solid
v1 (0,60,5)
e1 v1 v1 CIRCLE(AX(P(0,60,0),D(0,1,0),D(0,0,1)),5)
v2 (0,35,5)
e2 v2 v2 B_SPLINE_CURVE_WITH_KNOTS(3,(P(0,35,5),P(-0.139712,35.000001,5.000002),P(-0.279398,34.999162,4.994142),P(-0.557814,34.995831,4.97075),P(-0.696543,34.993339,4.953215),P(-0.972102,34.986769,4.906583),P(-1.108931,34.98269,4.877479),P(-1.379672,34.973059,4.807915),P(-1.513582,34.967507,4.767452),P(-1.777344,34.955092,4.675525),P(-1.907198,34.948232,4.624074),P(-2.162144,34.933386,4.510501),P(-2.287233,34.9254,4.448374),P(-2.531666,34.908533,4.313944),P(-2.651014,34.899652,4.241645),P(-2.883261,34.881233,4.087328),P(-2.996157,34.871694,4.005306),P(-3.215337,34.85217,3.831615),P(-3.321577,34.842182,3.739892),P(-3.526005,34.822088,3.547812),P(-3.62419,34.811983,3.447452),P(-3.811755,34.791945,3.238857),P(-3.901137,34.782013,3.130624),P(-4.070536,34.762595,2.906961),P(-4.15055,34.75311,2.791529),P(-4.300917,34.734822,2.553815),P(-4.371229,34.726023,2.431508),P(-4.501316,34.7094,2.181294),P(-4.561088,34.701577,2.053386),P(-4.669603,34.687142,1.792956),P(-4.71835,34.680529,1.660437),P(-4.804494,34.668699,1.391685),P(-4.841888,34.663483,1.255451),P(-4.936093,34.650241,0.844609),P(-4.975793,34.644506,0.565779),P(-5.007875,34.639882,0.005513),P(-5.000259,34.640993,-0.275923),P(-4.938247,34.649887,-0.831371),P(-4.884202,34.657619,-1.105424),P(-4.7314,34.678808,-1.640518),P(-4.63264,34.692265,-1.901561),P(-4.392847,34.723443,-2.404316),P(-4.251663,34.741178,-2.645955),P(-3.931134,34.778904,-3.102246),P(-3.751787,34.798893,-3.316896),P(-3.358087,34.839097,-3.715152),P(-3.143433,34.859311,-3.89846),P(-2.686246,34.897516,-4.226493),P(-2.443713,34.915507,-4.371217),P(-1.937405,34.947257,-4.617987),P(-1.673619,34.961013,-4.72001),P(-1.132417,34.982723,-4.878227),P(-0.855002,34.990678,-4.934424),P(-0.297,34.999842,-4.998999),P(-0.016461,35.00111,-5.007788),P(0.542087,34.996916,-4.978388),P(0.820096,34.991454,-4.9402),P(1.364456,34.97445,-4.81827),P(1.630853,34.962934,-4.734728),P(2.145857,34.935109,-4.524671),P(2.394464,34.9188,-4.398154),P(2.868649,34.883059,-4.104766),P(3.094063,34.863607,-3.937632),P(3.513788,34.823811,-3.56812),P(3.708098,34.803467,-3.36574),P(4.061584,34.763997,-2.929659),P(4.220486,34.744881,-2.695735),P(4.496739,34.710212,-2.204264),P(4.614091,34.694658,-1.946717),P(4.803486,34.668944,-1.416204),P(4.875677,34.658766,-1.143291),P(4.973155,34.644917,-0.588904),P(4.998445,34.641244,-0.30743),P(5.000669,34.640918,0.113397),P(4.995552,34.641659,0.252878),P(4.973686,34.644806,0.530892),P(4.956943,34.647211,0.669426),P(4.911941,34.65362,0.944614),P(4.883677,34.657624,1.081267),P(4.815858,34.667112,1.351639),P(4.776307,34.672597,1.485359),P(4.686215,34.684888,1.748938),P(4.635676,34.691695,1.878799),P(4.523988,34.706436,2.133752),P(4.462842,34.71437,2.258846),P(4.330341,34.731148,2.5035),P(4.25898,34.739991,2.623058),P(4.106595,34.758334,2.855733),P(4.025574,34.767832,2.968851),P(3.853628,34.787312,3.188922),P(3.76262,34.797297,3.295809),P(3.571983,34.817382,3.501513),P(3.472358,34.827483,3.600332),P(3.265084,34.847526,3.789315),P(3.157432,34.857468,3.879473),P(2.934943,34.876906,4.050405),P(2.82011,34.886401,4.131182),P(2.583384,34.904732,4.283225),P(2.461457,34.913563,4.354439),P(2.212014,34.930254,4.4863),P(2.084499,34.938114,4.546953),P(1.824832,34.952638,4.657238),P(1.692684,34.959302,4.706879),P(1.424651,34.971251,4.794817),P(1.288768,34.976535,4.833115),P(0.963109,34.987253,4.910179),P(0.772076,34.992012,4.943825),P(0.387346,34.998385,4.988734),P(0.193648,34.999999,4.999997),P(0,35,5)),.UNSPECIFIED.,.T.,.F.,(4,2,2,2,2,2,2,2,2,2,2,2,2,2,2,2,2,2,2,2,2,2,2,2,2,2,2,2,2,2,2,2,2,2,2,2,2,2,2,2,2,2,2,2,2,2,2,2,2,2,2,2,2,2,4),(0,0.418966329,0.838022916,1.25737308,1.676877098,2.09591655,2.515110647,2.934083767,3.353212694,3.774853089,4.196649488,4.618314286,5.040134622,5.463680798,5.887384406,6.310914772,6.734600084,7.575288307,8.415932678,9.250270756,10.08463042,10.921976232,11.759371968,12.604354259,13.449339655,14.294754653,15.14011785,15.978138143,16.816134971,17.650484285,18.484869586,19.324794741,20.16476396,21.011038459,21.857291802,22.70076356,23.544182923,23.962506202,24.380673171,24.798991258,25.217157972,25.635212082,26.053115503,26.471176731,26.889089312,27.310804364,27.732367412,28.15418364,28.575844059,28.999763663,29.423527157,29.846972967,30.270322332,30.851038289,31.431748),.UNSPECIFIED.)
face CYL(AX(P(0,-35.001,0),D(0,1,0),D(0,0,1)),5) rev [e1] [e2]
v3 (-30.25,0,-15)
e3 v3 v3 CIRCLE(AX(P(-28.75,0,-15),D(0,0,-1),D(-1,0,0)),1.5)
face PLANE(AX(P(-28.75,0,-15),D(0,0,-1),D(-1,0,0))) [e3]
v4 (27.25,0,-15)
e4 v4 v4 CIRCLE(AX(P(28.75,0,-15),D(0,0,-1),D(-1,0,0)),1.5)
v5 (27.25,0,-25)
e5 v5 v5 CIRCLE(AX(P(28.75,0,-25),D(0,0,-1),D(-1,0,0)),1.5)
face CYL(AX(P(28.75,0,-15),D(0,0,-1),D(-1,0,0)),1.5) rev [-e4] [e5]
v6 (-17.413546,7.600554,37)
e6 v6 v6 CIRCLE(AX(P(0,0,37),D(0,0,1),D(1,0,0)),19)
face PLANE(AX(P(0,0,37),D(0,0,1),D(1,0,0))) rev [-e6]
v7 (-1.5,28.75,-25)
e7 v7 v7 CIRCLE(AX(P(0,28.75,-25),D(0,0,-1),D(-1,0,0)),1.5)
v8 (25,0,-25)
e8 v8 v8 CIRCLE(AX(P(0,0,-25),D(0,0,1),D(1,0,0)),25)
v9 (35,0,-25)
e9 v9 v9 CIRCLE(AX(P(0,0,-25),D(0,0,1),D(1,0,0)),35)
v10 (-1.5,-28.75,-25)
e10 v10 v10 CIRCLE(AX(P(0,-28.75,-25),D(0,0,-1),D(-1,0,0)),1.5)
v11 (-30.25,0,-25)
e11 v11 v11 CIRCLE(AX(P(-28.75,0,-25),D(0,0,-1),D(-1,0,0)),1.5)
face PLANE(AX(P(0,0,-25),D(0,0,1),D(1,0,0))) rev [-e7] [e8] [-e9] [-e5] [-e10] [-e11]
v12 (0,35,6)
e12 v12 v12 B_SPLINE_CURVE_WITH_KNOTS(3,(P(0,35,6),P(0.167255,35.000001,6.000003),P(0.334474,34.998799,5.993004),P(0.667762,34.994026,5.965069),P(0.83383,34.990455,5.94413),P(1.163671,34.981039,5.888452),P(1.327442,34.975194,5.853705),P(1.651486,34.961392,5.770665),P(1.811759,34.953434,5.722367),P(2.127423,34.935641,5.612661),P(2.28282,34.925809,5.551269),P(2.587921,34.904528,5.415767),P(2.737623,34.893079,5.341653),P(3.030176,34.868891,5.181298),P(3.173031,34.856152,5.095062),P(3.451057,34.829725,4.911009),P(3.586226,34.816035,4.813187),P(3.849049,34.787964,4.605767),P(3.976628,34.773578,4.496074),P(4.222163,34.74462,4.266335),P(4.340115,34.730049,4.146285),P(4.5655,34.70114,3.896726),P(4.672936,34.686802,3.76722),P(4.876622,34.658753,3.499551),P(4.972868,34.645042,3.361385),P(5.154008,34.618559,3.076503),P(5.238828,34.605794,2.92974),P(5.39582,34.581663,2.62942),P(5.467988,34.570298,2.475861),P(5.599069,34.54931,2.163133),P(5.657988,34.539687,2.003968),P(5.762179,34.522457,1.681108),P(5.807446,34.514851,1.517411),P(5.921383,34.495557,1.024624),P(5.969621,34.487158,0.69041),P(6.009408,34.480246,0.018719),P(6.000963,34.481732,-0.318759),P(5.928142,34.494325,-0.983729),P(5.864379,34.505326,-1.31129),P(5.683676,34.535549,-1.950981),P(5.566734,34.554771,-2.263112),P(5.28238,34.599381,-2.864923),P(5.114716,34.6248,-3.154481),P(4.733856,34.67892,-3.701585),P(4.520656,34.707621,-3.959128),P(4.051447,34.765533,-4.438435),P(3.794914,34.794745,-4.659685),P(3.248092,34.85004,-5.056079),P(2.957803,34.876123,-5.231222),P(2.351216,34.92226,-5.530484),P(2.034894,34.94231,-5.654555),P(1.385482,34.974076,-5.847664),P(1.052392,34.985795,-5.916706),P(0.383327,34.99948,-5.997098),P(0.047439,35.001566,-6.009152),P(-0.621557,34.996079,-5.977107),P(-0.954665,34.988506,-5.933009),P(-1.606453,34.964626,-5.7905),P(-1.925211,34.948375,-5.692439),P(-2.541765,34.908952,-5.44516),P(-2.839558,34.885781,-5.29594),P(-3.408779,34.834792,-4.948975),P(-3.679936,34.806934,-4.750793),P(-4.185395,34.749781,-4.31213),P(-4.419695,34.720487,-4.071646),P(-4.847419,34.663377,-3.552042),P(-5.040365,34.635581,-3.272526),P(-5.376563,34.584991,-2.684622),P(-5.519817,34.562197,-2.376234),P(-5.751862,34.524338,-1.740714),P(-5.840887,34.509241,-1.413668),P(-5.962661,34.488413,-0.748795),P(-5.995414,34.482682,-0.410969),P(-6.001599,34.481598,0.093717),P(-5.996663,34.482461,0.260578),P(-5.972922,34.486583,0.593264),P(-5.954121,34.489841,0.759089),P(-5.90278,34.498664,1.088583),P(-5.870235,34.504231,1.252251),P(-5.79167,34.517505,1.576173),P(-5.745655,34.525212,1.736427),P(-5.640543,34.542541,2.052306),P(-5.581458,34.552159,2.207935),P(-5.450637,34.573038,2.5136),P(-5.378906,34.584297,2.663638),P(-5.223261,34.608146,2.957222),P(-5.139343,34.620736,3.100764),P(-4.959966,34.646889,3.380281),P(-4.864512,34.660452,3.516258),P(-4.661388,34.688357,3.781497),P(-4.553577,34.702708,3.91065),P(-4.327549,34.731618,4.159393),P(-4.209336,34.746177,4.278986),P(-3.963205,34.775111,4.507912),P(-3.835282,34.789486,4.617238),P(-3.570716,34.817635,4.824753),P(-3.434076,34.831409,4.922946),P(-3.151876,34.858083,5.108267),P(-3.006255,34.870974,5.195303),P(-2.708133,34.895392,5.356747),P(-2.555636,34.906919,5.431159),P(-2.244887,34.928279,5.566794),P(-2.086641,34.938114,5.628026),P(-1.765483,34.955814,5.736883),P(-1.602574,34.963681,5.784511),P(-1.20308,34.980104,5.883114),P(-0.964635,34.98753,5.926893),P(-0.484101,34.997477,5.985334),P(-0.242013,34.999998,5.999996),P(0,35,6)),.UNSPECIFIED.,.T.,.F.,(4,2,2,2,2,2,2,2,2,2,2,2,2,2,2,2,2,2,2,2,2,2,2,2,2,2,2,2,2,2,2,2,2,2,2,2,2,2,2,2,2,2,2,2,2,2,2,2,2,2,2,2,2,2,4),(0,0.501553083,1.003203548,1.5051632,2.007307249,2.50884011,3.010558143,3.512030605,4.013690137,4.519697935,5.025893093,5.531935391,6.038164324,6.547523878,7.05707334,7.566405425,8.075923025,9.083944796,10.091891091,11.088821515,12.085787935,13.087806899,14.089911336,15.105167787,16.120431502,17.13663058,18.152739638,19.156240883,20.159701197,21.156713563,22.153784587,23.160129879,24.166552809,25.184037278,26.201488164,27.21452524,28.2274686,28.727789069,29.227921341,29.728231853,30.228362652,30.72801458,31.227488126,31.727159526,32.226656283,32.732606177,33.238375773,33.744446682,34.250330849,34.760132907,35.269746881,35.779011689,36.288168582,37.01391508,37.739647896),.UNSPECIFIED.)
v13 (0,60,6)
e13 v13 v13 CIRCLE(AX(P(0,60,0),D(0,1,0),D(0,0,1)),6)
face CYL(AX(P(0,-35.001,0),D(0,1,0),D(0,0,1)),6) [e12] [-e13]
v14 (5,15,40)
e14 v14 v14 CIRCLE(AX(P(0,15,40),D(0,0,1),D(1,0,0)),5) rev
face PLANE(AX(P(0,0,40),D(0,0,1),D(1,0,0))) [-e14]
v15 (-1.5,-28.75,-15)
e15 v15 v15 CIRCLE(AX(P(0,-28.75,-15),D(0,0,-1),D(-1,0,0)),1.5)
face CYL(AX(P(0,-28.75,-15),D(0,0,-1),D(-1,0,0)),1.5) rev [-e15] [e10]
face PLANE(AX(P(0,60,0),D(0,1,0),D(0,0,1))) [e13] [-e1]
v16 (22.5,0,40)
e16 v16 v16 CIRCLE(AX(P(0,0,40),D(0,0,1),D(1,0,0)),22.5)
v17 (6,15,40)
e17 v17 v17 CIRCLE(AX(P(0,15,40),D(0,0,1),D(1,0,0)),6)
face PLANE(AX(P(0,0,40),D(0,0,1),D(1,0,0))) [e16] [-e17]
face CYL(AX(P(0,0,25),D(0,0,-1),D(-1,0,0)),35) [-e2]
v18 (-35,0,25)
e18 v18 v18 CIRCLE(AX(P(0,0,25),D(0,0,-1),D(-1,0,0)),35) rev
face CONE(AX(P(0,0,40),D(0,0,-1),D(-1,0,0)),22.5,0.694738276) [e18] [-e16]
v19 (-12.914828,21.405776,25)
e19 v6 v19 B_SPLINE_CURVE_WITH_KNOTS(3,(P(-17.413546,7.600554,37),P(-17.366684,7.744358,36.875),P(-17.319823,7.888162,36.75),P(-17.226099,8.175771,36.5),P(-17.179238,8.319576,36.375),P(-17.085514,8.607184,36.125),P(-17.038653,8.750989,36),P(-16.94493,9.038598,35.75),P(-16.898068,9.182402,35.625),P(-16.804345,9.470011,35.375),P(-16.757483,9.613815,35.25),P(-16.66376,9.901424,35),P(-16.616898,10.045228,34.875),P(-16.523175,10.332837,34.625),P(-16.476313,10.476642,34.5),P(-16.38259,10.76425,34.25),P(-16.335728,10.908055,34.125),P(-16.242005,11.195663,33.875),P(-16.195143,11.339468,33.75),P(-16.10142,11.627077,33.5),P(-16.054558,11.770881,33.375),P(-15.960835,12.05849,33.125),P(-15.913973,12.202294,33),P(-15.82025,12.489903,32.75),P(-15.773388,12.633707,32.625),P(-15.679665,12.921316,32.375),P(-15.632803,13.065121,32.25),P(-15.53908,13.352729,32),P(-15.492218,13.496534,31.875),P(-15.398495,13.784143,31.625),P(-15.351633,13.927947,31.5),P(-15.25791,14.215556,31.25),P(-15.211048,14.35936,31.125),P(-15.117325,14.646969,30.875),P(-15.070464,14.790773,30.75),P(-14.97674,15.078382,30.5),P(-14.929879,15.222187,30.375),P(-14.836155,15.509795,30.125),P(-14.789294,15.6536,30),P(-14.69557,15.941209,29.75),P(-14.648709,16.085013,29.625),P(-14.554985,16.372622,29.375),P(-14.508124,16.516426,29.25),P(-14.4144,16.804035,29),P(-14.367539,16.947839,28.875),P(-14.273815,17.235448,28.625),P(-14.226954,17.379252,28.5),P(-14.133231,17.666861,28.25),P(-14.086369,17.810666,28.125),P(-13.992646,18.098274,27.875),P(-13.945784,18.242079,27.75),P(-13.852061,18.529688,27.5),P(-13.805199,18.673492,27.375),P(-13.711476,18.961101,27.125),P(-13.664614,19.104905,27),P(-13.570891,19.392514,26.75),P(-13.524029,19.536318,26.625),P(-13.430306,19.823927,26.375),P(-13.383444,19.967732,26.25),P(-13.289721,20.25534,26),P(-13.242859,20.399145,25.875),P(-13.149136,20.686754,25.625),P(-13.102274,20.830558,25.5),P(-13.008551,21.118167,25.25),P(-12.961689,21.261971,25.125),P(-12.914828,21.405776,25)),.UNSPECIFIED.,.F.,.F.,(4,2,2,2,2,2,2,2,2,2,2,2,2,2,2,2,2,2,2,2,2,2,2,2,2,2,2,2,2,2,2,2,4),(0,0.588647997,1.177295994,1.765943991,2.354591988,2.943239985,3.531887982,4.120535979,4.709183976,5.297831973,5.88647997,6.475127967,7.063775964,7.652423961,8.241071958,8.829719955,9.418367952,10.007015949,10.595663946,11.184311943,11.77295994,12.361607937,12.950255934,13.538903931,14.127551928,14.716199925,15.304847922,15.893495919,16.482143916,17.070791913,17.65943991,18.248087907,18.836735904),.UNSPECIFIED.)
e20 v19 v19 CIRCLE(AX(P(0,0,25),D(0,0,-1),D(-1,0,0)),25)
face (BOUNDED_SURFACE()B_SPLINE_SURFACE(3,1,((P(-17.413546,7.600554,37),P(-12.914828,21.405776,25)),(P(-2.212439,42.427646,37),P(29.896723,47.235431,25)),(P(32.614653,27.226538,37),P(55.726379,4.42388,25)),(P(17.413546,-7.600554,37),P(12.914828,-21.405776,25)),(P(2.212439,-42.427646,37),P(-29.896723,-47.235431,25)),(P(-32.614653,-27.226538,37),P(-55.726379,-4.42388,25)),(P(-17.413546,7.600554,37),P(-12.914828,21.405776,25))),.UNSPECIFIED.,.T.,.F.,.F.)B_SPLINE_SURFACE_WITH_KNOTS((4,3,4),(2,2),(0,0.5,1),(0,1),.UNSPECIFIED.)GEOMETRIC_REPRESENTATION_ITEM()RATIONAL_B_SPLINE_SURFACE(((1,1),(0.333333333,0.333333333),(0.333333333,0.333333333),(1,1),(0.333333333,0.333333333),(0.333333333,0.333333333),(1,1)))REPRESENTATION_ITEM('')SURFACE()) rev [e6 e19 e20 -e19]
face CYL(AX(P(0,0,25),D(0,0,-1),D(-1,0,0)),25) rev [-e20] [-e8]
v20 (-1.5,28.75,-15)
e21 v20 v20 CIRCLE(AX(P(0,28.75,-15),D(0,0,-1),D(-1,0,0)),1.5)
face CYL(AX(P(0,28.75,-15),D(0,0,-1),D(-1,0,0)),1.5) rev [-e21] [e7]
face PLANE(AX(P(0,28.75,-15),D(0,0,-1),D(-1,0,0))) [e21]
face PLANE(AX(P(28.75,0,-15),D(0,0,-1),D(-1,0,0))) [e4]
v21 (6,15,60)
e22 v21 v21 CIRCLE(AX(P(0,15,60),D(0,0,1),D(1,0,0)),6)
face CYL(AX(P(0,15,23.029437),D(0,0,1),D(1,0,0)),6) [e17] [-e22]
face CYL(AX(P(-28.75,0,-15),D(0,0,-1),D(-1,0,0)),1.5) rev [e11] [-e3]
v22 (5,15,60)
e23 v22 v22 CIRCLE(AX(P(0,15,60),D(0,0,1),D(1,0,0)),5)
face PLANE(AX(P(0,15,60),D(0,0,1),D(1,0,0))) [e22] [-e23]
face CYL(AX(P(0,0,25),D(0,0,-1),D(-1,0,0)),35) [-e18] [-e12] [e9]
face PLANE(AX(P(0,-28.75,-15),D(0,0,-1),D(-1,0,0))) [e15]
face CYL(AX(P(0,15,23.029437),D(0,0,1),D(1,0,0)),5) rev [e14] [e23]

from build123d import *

# Parameters (mm, degrees)
SKETCH_1_R           = 35
SKETCH_1_R_2         = 25
EXTRUDE_1_DEPTH      = 25
SKETCH_2_R           = 1.5
CUT_EXTRUDE_1_DEPTH  = 10
SKETCH_4_R           = 22.5
SKETCH_3_R           = 35
EXTRUDE_2_REACH      = 110.858
EXTRUDE_2_END_RADIUS = 35
SKETCH_7_R           = 6
SKETCH_7_R_2         = 5
SKETCH_9_R           = 6
SKETCH_9_R_2         = 5
EXTRUDE_3_DEPTH      = 20


with BuildPart() as part:
    # 草图1 → 凸台-拉伸1 (new, symmetric)
    with BuildSketch(Plane.XY):
        Circle(SKETCH_1_R)
        Circle(SKETCH_1_R_2, mode=Mode.SUBTRACT)
    extrude(amount=EXTRUDE_1_DEPTH, both=True)

    # 草图2 → 切除-拉伸1 (cut)
    with BuildSketch(Plane(origin=(0, 0, -25), x_dir=(-1, 0, 0), z_dir=(0, 0, -1))):
        with Locations((0, 28.75)):
            Circle(SKETCH_2_R)
        with Locations((28.75, 0)):
            Circle(SKETCH_2_R)
        with Locations((0, -28.75)):
            Circle(SKETCH_2_R)
        with Locations((-28.75, 0)):
            Circle(SKETCH_2_R)
    extrude(amount=-CUT_EXTRUDE_1_DEPTH, mode=Mode.SUBTRACT)

    # 草图4 → Loft 1 section 0
    with BuildSketch(Plane.XY.offset(40)):
        Circle(SKETCH_4_R)
    # 草图3 → Loft 1 section 1
    with BuildSketch(Plane.XY.offset(25)):
        Circle(SKETCH_3_R)
    loft()

    # Loft 1 2: read off the stored shape, not the designer's step
    # Loft 1 2: loft between two sections, ruled curve by curve
    loft_1_2_from = [
        Edge.make_bspline([(-17.413546016, 7.600553608, 37), (-2.212438801, 42.42764564, 37), (32.614653231, 27.226538425, 37), (17.413546016, -7.600553608, 37), (2.212438801, -42.42764564, 37), (-32.614653231, -27.226538425, 37), (-17.413546016, 7.600553608, 37)], [0, 0, 0, 0, 0.5, 0.5, 0.5, 1, 1, 1, 1], 3, [1, 0.333333333, 0.333333333, 1, 0.333333333, 0.333333333, 1]),
    ]
    loft_1_2_to = [
        Edge.make_bspline([(-12.914827658, 21.405775542, 25), (29.896723426, 47.235430858, 25), (55.726378742, 4.423879774, 25), (12.914827658, -21.405775542, 25), (-29.896723426, -47.235430858, 25), (-55.726378742, -4.423879774, 25), (-12.914827658, 21.405775542, 25)], [0, 0, 0, 0, 0.5, 0.5, 0.5, 1, 1, 1, 1], 3, [1, 0.333333333, 0.333333333, 1, 0.333333333, 0.333333333, 1]),
    ]
    loft_1_2 = Solid(Shell([*[Face.make_surface_from_curves(loft_1_2_from[k], loft_1_2_to[k]) for k in range(1)], Face(Wire(loft_1_2_from)), Face(Wire(loft_1_2_to))]))
    add(loft_1_2, mode=Mode.SUBTRACT)

    # 凸台-拉伸2: up to this cylinder (the profile starts outside it)
    extrude_2_end = Plane(origin=(0, 0, -5.830294), z_dir=(0, 0, -1)) * Cylinder(EXTRUDE_2_END_RADIUS, 292.716, mode=Mode.PRIVATE)
    # 草图7 → 凸台-拉伸2 (add, up to the surface)
    with BuildSketch(Plane(origin=(0, 60, 0), x_dir=(1, 0, 0), z_dir=(0, 1, 0)), mode=Mode.PRIVATE) as extrude_2_sk1:
        with Locations(Location((0, 0, 0), (0, 0, 270))):
            Circle(SKETCH_7_R)
        with Locations(Location((0, 0, 0), (0, 0, 270))):
            Circle(SKETCH_7_R_2, mode=Mode.SUBTRACT)
    extrude_2_tool1 = extrude(extrude_2_sk1.sketch, amount=-EXTRUDE_2_REACH, mode=Mode.PRIVATE) - extrude_2_end
    add(extrude_2_tool1.solids().sort_by_distance((0, 60, -5.830294))[0])

    # 草图9 → 凸台-拉伸3 (add)
    with BuildSketch(Plane.XY.offset(60)):
        with Locations((0, 15)):
            Circle(SKETCH_9_R)
        with Locations((0, 15)):
            Circle(SKETCH_9_R_2, mode=Mode.SUBTRACT)
    extrude(amount=-EXTRUDE_3_DEPTH)


solid = part.part
